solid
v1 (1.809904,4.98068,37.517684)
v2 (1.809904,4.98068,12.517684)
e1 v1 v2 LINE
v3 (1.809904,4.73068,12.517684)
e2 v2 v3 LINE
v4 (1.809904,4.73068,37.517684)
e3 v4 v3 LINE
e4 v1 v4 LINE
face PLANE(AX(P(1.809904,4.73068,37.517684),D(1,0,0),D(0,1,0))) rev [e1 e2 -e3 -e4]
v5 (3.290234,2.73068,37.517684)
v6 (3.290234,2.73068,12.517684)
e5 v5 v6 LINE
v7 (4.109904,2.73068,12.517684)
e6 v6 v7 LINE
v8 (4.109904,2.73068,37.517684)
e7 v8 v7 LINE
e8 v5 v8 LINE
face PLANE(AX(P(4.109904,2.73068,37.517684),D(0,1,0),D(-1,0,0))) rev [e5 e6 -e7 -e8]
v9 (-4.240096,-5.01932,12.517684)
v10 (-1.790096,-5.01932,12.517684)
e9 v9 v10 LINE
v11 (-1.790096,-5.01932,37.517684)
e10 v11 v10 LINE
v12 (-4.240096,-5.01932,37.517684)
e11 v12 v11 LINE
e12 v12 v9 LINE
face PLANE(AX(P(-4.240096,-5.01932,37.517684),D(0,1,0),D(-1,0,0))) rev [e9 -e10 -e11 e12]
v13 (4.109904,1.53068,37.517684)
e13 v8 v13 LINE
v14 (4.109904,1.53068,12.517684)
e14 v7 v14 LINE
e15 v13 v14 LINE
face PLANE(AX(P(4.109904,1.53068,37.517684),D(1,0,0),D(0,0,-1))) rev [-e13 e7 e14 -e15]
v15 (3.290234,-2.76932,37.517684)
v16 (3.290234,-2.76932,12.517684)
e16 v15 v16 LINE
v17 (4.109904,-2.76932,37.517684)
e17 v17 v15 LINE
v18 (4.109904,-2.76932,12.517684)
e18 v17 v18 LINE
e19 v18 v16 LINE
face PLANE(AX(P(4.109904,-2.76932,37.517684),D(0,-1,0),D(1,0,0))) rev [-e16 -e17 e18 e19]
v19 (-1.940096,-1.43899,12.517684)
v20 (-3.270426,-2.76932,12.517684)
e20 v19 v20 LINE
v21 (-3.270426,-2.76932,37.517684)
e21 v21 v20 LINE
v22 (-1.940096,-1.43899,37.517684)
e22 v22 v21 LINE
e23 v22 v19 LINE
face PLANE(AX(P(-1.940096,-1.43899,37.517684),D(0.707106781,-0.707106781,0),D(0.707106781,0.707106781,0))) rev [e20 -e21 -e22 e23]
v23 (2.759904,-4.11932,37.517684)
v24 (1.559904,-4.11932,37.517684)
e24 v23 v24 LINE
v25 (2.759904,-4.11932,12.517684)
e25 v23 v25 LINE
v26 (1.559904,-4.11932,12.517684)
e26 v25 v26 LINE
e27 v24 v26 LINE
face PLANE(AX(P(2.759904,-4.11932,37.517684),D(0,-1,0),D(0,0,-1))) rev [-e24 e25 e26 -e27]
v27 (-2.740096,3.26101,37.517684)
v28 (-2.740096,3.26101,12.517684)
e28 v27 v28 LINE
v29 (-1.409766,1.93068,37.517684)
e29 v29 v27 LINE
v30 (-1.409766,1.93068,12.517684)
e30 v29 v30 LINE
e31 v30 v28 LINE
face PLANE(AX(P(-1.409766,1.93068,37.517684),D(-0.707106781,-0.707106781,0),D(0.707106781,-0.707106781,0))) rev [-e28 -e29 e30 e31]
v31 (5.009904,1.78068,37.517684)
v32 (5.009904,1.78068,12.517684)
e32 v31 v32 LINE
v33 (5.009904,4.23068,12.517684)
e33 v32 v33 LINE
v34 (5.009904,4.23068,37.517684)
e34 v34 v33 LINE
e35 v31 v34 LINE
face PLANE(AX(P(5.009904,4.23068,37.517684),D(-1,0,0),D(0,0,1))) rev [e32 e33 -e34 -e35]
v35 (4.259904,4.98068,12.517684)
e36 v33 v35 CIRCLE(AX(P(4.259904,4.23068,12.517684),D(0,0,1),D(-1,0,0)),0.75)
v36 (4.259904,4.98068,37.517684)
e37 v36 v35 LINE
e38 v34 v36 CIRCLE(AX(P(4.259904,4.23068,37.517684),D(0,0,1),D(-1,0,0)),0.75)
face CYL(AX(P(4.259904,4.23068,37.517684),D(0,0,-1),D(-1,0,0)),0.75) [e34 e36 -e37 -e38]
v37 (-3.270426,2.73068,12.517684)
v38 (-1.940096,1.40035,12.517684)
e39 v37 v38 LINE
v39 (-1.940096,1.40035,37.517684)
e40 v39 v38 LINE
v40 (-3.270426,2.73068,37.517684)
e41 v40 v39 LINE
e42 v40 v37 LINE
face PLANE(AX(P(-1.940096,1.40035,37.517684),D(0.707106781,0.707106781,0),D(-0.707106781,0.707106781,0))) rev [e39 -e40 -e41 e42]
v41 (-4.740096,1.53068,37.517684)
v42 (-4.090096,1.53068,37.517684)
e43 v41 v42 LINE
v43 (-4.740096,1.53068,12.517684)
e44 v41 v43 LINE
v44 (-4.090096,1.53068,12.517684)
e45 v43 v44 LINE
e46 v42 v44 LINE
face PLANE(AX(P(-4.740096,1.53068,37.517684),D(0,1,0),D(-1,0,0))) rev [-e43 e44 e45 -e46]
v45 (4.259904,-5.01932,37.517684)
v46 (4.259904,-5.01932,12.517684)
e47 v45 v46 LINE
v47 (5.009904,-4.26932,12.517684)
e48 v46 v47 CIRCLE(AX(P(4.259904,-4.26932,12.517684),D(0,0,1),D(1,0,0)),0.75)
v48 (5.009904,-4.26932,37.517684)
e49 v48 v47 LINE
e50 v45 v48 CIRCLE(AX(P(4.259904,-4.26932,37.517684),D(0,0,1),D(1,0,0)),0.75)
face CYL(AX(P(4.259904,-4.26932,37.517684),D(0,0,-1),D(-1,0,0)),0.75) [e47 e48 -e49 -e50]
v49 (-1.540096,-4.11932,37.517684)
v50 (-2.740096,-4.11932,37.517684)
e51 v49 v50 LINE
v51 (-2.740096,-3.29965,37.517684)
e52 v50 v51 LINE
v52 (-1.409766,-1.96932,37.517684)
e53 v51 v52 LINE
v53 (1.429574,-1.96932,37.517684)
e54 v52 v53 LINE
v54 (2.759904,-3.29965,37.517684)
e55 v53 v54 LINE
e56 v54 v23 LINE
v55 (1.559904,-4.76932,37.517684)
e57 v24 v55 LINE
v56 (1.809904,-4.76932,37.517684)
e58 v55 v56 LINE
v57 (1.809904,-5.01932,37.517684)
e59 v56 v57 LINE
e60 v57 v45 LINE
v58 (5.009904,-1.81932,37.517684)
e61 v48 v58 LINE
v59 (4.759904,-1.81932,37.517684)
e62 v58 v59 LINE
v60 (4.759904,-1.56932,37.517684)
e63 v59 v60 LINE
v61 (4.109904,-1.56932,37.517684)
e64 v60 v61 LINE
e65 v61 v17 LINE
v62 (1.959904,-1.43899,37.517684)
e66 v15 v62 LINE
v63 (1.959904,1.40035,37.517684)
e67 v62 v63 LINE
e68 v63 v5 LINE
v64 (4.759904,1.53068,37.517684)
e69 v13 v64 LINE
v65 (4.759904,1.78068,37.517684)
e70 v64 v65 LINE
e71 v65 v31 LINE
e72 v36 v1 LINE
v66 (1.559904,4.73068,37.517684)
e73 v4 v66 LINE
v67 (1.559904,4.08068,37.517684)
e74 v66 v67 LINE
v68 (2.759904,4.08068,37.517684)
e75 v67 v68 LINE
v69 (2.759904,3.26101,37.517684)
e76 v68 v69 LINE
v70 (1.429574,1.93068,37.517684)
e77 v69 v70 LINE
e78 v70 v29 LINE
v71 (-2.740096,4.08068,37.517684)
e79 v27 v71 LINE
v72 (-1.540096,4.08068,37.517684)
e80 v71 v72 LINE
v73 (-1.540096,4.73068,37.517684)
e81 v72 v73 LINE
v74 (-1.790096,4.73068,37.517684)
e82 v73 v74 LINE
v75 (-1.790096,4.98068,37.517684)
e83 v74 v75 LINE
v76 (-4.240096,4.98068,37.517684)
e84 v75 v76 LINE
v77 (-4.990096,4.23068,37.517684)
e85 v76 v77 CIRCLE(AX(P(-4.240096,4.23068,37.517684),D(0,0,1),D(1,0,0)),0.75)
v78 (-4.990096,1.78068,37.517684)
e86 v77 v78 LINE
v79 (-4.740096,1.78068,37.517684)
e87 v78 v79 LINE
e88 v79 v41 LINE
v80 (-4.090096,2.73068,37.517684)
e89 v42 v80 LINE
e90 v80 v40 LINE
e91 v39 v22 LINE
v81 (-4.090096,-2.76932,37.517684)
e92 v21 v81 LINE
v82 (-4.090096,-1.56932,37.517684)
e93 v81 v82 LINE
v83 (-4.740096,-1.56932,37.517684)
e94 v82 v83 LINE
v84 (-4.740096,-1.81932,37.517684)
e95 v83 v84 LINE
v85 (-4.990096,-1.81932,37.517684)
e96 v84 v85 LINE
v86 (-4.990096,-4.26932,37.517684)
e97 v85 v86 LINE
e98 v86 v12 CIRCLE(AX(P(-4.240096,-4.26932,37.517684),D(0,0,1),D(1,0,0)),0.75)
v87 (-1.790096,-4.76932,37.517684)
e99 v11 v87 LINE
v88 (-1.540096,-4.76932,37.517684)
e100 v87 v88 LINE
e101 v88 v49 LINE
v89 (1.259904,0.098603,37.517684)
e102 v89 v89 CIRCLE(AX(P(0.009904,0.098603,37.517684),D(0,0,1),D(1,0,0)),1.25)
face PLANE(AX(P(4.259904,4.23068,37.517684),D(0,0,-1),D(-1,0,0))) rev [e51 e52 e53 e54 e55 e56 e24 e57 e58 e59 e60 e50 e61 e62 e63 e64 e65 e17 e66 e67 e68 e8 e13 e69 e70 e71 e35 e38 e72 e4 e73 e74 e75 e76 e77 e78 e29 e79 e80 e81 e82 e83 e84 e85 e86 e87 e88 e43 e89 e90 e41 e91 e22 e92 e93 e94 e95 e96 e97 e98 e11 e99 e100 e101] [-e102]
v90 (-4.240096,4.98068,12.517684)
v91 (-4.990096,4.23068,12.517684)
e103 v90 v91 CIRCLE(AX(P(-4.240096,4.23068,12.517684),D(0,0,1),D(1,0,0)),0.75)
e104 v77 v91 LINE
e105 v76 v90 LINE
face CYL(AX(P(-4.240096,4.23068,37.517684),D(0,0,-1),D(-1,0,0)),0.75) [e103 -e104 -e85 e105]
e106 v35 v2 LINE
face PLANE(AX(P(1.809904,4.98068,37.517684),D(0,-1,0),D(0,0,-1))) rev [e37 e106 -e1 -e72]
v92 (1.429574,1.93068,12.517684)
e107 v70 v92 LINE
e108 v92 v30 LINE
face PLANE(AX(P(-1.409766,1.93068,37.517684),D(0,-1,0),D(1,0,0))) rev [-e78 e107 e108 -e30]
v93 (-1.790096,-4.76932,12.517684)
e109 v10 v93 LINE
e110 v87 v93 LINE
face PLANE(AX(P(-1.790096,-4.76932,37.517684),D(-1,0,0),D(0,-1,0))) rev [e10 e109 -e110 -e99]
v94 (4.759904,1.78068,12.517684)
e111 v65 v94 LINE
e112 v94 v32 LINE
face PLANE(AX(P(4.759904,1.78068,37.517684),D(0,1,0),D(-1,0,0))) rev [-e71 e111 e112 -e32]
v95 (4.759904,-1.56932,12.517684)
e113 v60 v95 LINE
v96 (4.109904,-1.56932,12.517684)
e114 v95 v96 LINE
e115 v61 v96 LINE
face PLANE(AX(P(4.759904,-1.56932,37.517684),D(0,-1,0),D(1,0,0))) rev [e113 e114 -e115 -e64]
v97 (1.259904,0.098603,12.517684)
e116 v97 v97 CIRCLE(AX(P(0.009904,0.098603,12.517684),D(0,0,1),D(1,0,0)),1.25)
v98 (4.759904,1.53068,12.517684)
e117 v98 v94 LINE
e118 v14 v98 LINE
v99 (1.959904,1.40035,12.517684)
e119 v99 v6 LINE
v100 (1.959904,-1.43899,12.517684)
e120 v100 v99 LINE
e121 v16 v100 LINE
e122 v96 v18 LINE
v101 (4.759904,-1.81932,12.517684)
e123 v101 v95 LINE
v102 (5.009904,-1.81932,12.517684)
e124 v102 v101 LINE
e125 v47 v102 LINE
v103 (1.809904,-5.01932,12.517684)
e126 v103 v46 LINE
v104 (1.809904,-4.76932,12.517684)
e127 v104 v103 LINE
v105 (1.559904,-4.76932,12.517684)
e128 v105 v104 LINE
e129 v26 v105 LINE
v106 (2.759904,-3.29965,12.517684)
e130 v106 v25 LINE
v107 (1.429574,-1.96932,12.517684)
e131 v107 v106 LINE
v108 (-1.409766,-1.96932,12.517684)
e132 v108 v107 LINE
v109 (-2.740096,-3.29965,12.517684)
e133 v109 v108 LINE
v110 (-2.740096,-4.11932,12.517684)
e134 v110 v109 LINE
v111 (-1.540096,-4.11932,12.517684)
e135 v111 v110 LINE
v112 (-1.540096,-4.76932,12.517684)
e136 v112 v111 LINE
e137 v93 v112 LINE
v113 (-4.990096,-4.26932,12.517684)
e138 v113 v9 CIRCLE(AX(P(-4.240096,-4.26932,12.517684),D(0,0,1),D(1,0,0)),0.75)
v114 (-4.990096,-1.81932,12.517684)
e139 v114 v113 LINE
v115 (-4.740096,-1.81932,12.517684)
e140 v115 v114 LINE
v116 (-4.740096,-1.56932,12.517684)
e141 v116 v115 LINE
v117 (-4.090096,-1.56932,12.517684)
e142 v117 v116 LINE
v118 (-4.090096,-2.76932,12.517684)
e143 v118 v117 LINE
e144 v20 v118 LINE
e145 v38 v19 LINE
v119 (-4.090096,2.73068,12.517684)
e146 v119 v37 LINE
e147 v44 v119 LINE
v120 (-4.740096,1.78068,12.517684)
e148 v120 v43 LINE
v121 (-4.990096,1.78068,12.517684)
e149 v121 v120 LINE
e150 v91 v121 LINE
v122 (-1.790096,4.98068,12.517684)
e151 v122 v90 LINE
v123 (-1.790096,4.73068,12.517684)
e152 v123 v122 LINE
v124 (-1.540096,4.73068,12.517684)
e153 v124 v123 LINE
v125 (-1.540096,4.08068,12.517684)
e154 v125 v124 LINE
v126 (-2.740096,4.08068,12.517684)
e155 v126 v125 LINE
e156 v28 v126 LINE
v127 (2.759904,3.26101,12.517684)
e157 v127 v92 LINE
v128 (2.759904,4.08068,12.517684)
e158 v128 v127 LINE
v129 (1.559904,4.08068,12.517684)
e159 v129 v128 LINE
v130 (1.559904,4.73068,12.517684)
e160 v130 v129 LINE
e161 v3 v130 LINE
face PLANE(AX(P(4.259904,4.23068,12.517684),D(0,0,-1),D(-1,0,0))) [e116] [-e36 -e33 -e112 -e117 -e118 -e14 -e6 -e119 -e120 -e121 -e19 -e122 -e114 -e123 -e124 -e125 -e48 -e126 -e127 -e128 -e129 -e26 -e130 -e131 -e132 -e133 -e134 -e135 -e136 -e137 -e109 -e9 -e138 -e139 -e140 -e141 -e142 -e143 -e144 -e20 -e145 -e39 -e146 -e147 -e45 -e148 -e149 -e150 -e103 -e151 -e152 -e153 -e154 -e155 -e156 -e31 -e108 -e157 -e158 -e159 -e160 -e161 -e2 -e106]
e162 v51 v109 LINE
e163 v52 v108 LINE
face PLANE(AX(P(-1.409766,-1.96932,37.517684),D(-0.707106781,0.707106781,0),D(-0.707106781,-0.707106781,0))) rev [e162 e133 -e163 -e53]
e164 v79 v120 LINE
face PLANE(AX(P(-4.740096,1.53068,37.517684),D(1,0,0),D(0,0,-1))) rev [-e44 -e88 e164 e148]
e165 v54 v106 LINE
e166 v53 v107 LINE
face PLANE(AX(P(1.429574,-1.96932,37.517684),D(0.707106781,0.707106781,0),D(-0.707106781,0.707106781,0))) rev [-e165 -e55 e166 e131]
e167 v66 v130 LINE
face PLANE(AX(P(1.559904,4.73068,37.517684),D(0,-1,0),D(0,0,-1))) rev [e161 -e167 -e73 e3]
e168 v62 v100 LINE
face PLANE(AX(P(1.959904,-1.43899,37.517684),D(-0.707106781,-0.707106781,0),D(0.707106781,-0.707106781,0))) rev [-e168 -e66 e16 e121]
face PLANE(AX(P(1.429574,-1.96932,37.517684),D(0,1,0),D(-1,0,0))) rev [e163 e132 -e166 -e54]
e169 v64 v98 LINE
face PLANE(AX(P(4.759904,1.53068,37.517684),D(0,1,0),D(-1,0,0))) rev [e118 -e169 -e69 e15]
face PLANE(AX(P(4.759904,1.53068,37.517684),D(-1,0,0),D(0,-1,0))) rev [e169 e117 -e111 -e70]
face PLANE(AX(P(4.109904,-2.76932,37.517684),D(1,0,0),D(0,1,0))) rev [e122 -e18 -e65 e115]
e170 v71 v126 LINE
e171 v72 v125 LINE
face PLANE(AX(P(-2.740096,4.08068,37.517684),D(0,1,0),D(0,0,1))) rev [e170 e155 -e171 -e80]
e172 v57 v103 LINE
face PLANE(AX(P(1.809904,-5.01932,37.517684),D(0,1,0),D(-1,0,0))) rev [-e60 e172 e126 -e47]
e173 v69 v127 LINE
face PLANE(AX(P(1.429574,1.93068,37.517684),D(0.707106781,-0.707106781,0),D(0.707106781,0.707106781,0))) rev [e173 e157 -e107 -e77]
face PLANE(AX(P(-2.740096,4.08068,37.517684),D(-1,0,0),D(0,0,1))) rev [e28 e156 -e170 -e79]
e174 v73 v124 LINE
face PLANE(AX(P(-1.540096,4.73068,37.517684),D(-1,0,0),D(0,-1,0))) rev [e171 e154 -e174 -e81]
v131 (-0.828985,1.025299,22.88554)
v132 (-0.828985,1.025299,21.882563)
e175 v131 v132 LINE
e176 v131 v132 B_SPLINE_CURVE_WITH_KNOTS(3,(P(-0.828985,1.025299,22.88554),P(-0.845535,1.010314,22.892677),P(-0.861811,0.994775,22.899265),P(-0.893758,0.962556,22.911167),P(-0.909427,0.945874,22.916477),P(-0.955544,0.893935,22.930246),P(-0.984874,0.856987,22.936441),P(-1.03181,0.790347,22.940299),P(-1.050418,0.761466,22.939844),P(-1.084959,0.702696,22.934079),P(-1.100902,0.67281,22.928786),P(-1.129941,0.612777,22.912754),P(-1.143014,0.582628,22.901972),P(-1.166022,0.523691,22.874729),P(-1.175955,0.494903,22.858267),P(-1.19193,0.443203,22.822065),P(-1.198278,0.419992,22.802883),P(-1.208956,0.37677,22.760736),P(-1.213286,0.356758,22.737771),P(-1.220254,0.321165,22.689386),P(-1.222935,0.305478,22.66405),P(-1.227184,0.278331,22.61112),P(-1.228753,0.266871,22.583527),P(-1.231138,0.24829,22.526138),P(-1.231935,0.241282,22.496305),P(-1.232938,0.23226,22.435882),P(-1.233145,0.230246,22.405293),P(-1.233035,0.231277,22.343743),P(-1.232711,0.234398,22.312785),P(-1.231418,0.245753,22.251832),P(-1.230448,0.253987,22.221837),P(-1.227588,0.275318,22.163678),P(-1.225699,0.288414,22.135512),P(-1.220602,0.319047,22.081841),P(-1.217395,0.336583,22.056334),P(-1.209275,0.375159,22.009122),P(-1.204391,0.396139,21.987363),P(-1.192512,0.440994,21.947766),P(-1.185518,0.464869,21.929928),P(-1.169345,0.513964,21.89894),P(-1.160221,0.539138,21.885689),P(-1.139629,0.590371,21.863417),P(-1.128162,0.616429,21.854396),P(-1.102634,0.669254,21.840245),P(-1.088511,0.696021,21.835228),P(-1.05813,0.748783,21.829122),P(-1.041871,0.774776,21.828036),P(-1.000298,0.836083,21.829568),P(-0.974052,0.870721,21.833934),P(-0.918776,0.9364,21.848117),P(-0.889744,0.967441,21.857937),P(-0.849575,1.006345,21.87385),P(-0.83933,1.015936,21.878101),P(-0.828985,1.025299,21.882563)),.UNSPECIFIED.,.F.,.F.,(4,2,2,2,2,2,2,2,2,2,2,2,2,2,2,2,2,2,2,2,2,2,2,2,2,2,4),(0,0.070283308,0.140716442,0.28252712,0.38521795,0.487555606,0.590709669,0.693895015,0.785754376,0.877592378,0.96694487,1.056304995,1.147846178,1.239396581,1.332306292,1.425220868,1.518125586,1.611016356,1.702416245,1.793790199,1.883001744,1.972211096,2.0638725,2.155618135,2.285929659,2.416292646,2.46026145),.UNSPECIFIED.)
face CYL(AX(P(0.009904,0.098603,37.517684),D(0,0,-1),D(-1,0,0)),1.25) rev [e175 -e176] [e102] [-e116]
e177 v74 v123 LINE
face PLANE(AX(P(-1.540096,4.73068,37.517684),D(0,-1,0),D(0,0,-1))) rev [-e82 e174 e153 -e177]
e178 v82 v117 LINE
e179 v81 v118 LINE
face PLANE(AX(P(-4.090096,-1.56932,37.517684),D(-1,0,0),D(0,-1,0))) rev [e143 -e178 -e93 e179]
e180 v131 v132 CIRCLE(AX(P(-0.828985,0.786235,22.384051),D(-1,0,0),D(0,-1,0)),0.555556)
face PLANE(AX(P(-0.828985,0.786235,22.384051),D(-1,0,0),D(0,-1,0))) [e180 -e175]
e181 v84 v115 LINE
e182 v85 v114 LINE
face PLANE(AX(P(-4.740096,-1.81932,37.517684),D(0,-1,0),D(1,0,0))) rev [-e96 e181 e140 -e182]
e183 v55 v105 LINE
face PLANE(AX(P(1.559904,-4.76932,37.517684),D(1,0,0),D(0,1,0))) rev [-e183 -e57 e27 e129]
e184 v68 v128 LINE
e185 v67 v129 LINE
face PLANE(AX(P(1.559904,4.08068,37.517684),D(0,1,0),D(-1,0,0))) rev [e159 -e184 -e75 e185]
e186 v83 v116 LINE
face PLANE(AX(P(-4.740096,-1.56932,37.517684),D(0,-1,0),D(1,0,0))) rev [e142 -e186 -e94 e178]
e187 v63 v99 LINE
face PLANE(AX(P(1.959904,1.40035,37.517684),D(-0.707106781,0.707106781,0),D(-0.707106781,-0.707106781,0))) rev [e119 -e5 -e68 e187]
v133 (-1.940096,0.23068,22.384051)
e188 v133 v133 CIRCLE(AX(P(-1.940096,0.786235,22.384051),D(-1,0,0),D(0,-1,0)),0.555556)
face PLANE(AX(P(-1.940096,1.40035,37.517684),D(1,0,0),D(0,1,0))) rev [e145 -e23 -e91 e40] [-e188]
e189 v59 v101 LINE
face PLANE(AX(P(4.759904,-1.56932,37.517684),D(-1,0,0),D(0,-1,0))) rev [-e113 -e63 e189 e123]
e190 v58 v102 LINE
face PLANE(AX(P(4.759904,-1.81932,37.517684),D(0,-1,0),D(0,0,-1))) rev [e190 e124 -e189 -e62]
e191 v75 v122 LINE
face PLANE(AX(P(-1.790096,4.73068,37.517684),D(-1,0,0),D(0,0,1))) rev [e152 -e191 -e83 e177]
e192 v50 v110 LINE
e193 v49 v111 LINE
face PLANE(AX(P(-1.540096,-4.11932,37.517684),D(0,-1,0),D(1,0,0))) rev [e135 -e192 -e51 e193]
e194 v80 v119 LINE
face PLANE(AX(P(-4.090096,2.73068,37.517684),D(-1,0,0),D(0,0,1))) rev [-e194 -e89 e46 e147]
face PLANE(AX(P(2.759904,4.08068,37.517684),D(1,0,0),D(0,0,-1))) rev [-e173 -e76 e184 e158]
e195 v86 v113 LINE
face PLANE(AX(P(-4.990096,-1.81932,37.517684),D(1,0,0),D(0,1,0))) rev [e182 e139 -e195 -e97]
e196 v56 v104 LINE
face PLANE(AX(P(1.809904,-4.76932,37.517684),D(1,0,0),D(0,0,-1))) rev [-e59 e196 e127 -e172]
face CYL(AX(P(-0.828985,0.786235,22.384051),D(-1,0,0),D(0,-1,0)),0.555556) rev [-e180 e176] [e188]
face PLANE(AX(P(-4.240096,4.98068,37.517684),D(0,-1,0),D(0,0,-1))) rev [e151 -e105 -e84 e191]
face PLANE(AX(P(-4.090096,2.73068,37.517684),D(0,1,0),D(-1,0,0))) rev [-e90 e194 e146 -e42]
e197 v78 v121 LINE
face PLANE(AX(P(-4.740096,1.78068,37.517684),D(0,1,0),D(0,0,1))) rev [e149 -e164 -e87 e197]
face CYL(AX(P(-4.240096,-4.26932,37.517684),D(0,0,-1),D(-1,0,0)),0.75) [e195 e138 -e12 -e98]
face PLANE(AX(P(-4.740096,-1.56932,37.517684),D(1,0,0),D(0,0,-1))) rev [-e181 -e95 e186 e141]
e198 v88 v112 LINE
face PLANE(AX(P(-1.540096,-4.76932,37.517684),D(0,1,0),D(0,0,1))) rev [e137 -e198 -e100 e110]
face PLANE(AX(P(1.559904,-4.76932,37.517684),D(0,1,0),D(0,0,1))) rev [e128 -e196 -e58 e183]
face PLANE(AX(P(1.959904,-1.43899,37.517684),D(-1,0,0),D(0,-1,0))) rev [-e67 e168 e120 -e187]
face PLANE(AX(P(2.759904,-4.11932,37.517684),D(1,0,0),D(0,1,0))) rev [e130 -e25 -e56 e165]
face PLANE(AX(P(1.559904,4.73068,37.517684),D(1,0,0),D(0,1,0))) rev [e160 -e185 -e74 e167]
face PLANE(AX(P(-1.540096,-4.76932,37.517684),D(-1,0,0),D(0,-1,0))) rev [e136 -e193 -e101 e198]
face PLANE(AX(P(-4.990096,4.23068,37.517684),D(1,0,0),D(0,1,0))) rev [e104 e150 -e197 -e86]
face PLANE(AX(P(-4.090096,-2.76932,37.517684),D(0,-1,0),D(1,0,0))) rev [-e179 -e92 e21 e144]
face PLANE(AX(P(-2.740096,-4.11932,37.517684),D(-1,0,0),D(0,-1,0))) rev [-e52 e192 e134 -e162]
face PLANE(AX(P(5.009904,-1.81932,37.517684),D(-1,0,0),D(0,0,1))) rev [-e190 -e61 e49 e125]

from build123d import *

# Parameters (mm, degrees)
SKETCH1_R           = 2.5
BOSS_EXTRUDE1_DEPTH = 50
SCALE_2_SCALE       = 3
SCALE_3_SCALE       = 6
SCALE_5_SCALE       = 2
SCALE_6_SCALE       = 0.25
SCALE_7_SCALE       = 0.125
SCALE_8_SCALE       = 0.25
SCALE_9_SCALE       = 4
SCALE_10_SCALE      = 4
OTHER_START         = -17.55
OTHER_1_OUTLINE_R   = 5
OTHER_1_DEPTH       = 10
SCALE_11_SCALE      = 0.111111111


# Read off the part's stored shape, not the designer's step: 孔1
with BuildPart() as part:
    # Sketch1 → Boss-Extrude1 (new body)
    with BuildSketch(Plane.XY):
        with BuildLine():
            Line((2.839339828, 3.9), (5.5, 6.560660172))
            Line((5.5, 6.560660172), (5.5, 8.2))
            Line((5.5, 8.2), (3.1, 8.2))
            Line((3.1, 8.2), (3.1, 9.5))
            Line((3.1, 9.5), (3.6, 9.5))
            Line((3.6, 9.5), (3.6, 10))
            Line((3.6, 10), (8.5, 10))
            ThreePointArc((8.5, 10), (9.560660172, 9.560660172), (10, 8.5))
            Line((10, 8.5), (10, 3.6))
            Line((10, 3.6), (9.5, 3.6))
            Line((9.5, 3.6), (9.5, 3.1))
            Line((9.5, 3.1), (8.2, 3.1))
            Line((8.2, 3.1), (8.2, 5.5))
            Line((8.2, 5.5), (6.560660172, 5.5))
            Line((6.560660172, 5.5), (3.9, 2.839339828))
            Line((3.9, 2.839339828), (3.9, -2.839339828))
            Line((3.9, -2.839339828), (6.560660172, -5.5))
            Line((6.560660172, -5.5), (8.2, -5.5))
            Line((8.2, -5.5), (8.2, -3.1))
            Line((8.2, -3.1), (9.5, -3.1))
            Line((9.5, -3.1), (9.5, -3.6))
            Line((9.5, -3.6), (10, -3.6))
            Line((10, -3.6), (10, -8.5))
            ThreePointArc((10, -8.5), (9.560660172, -9.560660172), (8.5, -10))
            Line((8.5, -10), (3.6, -10))
            Line((3.6, -10), (3.6, -9.5))
            Line((3.6, -9.5), (3.1, -9.5))
            Line((3.1, -9.5), (3.1, -8.2))
            Line((3.1, -8.2), (5.5, -8.2))
            Line((5.5, -8.2), (5.5, -6.560660172))
            Line((5.5, -6.560660172), (2.839339828, -3.9))
            Line((2.839339828, -3.9), (-2.839339828, -3.9))
            Line((-2.839339828, -3.9), (-5.5, -6.560660172))
            Line((-5.5, -6.560660172), (-5.5, -8.2))
            Line((-5.5, -8.2), (-3.1, -8.2))
            Line((-3.1, -8.2), (-3.1, -9.5))
            Line((-3.1, -9.5), (-3.6, -9.5))
            Line((-3.6, -9.5), (-3.6, -10))
            Line((-3.6, -10), (-8.5, -10))
            ThreePointArc((-8.5, -10), (-9.560660172, -9.560660172), (-10, -8.5))
            Line((-10, -8.5), (-10, -3.6))
            Line((-10, -3.6), (-9.5, -3.6))
            Line((-9.5, -3.6), (-9.5, -3.1))
            Line((-9.5, -3.1), (-8.2, -3.1))
            Line((-8.2, -3.1), (-8.2, -5.5))
            Line((-8.2, -5.5), (-6.560660172, -5.5))
            Line((-6.560660172, -5.5), (-3.9, -2.839339828))
            Line((-3.9, -2.839339828), (-3.9, 2.839339828))
            Line((-3.9, 2.839339828), (-6.560660172, 5.5))
            Line((-6.560660172, 5.5), (-8.2, 5.5))
            Line((-8.2, 5.5), (-8.2, 3.1))
            Line((-8.2, 3.1), (-9.5, 3.1))
            Line((-9.5, 3.1), (-9.5, 3.6))
            Line((-9.5, 3.6), (-10, 3.6))
            Line((-10, 3.6), (-10, 8.5))
            ThreePointArc((-10, 8.5), (-9.560660172, 9.560660172), (-8.5, 10))
            Line((-8.5, 10), (-3.6, 10))
            Line((-3.6, 10), (-3.6, 9.5))
            Line((-3.6, 9.5), (-3.1, 9.5))
            Line((-3.1, 9.5), (-3.1, 8.2))
            Line((-3.1, 8.2), (-5.5, 8.2))
            Line((-5.5, 8.2), (-5.5, 6.560660172))
            Line((-5.5, 6.560660172), (-2.839339828, 3.9))
            Line((-2.839339828, 3.9), (2.839339828, 3.9))
        make_face()
        with Locations((0, 0.235847297)):
            Circle(SKETCH1_R, mode=Mode.SUBTRACT)
    extrude(amount=BOSS_EXTRUDE1_DEPTH)


with BuildPart() as part_1:
    # 缩放比例2: scaled about (0, -0.027095247, 25)
    add(part.part.scale(SCALE_2_SCALE).moved(Location((0, 0.054190494, -50))))


with BuildPart() as part_2:
    # 缩放比例3: scaled about (0, -0.027095247, 25)
    add(part_1.part.scale(SCALE_3_SCALE).moved(Location((0, 0.135476235, -125))))


with BuildPart() as part_3:
    # 缩放比例5: scaled about (0, -0.027095249, 25)
    add(part_2.part.scale(SCALE_5_SCALE).moved(Location((0, 0.027095249, -25))))


with BuildPart() as part_4:
    # 缩放比例6: scaled about (0, -0.027095249, 25)
    add(part_3.part.scale(SCALE_6_SCALE).moved(Location((0, -0.020321437, 18.75))))


with BuildPart() as part_5:
    # 缩放比例7: scaled about (0, -0.027095249, 25)
    add(part_4.part.scale(SCALE_7_SCALE).moved(Location((0, -0.023708343, 21.875))))


with BuildPart() as part_6:
    # 缩放比例8: scaled about (0, -0.027095249, 25)
    add(part_5.part.scale(SCALE_8_SCALE).moved(Location((0, -0.020321437, 18.75))))


with BuildPart() as part_7:
    # 缩放比例9: scaled about (0, -0.027095249, 25)
    add(part_6.part.scale(SCALE_9_SCALE).moved(Location((0, 0.081285747, -75))))


with BuildPart() as part_8:
    # 缩放比例10: scaled about (0, -0.027095249, 25)
    add(part_7.part.scale(SCALE_10_SCALE).moved(Location((0, 0.081285747, -75))))

    # 孔1 outline → 孔1 (cut)
    with BuildSketch(Plane.YZ.offset(OTHER_START)):
        with Locations((7.344833538, 1.297306883)):
            Circle(OTHER_1_OUTLINE_R)
    extrude(amount=OTHER_1_DEPTH, mode=Mode.SUBTRACT)


with BuildPart() as part_9:
    # 缩放比例11: scaled about (0.011151362, -0.033595737, 25.019879338)
    add(part_8.part.scale(SCALE_11_SCALE).moved(Location((0.009912322, -0.029862877, 22.239892745))))


solid = part_9.part
